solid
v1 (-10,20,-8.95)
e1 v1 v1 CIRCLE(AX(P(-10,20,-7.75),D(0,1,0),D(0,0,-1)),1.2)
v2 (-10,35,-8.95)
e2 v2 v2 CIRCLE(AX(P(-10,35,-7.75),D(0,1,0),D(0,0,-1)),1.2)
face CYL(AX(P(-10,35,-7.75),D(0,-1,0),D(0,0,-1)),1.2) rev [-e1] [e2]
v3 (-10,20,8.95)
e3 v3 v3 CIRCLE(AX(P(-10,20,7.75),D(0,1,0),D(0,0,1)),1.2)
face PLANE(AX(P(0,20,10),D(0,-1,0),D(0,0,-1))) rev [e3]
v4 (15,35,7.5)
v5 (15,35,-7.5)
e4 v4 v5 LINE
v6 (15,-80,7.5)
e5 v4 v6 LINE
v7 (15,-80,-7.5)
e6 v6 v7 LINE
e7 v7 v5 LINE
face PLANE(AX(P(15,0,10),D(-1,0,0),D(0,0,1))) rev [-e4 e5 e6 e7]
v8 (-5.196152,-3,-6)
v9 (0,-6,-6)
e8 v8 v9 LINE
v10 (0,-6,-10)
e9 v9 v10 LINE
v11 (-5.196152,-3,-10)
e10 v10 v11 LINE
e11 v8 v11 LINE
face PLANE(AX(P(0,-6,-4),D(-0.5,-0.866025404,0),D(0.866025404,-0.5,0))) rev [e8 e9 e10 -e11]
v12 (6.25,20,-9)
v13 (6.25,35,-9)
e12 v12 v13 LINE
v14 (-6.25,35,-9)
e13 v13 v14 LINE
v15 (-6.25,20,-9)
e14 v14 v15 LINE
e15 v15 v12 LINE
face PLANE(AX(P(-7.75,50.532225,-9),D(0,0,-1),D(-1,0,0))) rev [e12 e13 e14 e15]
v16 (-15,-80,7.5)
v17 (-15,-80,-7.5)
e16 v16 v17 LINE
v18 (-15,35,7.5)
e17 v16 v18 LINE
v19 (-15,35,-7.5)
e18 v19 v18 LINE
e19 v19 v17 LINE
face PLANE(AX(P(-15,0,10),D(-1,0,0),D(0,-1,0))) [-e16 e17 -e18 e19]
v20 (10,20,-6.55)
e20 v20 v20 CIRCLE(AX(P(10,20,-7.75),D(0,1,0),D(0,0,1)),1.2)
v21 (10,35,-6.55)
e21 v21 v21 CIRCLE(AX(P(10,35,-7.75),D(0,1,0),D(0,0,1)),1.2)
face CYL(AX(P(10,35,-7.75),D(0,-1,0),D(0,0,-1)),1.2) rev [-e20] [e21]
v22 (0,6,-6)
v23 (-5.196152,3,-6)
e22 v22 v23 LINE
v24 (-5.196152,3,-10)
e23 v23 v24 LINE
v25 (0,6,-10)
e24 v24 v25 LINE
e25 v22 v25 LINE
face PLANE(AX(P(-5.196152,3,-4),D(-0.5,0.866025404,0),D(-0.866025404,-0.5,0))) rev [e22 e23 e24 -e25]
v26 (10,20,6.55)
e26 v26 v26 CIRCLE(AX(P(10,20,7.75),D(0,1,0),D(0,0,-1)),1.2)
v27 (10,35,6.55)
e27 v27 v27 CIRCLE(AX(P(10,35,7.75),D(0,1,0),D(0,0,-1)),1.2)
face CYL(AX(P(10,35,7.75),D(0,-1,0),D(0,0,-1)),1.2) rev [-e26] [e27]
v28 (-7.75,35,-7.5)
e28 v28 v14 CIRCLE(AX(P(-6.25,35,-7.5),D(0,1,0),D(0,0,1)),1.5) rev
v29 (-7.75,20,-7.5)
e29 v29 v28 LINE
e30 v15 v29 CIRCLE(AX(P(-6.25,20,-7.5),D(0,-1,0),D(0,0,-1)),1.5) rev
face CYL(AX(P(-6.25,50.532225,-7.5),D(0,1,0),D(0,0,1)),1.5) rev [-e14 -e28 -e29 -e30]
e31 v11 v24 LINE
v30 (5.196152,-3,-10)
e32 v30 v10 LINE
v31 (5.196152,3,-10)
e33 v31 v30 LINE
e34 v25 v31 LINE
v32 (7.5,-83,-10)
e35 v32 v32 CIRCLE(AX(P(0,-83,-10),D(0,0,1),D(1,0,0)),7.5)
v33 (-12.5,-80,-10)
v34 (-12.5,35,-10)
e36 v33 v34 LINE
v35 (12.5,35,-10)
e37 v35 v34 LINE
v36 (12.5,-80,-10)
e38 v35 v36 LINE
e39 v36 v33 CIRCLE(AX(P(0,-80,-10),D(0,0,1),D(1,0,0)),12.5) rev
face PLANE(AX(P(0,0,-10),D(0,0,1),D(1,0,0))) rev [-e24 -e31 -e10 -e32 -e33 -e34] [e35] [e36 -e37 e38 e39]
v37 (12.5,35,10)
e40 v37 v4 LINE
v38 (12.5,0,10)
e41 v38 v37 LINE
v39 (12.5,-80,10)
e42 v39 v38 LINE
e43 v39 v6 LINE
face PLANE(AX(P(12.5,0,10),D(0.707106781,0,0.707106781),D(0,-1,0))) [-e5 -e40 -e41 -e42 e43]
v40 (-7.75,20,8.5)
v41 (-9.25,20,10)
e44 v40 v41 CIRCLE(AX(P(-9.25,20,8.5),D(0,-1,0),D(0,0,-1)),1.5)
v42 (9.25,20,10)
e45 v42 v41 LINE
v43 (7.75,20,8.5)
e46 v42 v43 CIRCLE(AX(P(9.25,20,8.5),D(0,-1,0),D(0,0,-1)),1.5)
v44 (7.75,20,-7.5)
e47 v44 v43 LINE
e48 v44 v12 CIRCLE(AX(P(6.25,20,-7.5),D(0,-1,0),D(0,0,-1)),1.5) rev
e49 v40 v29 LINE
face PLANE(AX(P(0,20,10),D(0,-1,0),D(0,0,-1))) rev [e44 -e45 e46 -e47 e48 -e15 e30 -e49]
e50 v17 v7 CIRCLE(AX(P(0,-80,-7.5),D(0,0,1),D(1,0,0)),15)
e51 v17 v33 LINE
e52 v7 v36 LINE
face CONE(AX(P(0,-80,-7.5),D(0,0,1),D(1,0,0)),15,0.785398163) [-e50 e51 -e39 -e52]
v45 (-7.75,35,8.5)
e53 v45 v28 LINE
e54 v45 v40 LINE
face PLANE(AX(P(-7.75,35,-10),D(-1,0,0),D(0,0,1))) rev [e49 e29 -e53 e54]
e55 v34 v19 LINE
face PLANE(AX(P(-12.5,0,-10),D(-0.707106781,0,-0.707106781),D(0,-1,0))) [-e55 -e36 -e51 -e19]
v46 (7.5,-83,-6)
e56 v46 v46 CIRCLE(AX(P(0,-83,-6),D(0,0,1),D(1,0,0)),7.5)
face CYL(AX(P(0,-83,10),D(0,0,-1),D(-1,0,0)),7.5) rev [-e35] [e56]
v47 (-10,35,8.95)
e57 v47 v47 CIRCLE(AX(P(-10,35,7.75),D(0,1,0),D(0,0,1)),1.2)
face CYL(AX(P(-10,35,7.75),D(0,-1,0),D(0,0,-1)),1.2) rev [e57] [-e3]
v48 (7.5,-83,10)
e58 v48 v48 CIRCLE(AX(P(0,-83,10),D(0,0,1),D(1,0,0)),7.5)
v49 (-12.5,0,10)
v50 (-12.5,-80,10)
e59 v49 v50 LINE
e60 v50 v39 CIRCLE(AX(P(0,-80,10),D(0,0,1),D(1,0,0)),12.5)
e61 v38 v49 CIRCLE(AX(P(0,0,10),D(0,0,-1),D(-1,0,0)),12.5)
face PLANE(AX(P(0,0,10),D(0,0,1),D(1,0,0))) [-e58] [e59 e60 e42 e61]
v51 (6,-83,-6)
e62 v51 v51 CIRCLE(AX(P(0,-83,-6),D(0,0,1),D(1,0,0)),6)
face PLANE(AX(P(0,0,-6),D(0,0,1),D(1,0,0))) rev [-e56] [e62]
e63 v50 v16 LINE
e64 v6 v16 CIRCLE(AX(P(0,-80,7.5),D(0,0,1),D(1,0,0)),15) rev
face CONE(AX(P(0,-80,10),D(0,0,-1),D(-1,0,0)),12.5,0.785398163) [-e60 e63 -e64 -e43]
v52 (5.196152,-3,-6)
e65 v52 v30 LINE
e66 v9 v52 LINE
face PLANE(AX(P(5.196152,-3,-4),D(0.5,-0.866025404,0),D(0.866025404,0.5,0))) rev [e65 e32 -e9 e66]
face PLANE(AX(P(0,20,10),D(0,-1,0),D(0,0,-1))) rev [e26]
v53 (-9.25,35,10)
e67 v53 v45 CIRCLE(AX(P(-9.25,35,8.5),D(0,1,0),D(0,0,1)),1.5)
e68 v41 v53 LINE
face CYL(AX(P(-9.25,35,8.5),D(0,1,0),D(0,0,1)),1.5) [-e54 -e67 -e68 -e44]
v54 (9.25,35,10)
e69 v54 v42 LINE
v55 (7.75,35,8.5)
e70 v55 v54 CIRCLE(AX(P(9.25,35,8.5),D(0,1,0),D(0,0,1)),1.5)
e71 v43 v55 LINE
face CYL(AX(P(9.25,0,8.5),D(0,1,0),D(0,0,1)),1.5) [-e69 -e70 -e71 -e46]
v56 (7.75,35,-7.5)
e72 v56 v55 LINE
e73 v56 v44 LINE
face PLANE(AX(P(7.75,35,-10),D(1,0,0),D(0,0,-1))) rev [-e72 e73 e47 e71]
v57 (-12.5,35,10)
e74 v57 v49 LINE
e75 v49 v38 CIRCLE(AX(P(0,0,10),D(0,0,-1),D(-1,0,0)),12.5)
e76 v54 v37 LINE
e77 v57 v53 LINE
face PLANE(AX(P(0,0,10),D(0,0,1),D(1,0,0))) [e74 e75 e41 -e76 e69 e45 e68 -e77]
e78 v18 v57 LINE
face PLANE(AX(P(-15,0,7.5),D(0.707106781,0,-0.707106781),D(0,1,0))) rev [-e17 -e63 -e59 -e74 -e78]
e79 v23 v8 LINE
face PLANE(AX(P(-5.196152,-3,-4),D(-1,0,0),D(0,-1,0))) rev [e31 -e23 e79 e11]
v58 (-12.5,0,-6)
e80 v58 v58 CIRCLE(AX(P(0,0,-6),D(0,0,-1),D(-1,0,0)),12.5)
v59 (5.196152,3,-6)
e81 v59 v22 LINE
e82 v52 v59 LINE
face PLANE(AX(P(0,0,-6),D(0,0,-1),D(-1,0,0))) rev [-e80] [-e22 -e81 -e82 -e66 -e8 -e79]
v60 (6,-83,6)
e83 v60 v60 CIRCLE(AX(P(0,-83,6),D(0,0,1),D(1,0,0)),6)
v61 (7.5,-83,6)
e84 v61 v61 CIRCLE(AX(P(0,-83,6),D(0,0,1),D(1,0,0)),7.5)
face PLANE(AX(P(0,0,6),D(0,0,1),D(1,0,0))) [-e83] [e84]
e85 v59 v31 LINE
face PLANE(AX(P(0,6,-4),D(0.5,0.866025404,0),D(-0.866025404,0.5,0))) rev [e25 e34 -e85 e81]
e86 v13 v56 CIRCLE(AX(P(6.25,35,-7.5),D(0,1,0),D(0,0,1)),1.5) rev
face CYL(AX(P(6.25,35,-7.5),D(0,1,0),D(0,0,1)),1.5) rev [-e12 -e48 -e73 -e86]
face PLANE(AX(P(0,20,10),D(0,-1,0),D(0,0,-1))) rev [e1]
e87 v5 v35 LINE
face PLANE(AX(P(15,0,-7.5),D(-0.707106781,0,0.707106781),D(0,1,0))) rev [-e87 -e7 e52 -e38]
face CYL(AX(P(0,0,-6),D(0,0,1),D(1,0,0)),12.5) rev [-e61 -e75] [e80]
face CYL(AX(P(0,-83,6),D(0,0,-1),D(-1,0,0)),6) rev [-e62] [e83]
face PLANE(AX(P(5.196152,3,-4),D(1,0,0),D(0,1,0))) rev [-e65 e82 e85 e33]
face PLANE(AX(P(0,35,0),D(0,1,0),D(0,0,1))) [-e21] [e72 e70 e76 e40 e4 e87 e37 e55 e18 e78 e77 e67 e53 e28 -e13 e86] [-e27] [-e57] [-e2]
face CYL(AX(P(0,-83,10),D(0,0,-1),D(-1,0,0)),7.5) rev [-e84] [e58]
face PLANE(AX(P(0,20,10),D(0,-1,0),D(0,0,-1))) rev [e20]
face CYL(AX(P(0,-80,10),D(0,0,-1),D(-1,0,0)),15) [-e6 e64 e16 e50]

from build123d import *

# Parameters (mm, degrees)
SKETCH1_R           = 4
SKETCH1_R_2         = 7.5
BOSS_EXTRUDE1_DEPTH = 10
SKETCH2_R           = 7.5
SKETCH2_R_2         = 6
BOSS_EXTRUDE2_DEPTH = 6
CUT_EXTRUDE2_DEPTH  = 6
SKETCH4_R           = 12.5
CUT_EXTRUDE1_DEPTH  = 16
SKETCH8_W           = 7.25
SKETCH8_H           = 20
SKETCH8_R           = 1.2
BOSS_EXTRUDE3_DEPTH = 15
SKETCH10_W          = 15.5
SKETCH10_H          = 1
BOSS_EXTRUDE4_DEPTH = 15
FILLET1_R           = 1.5
CHAMFER1_SIZE       = 2.5


with BuildPart() as part:
    # Sketch1 → Boss-Extrude1 (new, symmetric)
    with BuildSketch(Plane.XY):
        with BuildLine():
            Line((-15, -80), (-15, 20))
            Line((-15, 20), (15, 20))
            Line((15, 20), (15, -80))
            ThreePointArc((15, -80), (0, -95), (-15, -80))
        make_face()
        Circle(SKETCH1_R, mode=Mode.SUBTRACT)
        with Locations((0, -83)):
            Circle(SKETCH1_R_2, mode=Mode.SUBTRACT)
    extrude(amount=BOSS_EXTRUDE1_DEPTH, both=True)

    # Sketch2 → Boss-Extrude2 (add, symmetric)
    with BuildSketch(Plane.XY):
        with Locations((0, -83)):
            Circle(SKETCH2_R)
        with Locations((0, -83)):
            Circle(SKETCH2_R_2, mode=Mode.SUBTRACT)
    extrude(amount=BOSS_EXTRUDE2_DEPTH, both=True)

    # Sketch11 → Cut-Extrude2 (cut)
    with BuildSketch(Plane(origin=(0, 0, -10), x_dir=(-1, 0, 0), z_dir=(0, 0, -1))):
        Polygon((0, 6), (-5.196152423, 3), (-5.196152423, -3), (0, -6), (5.196152423, -3), (5.196152423, 3), align=None)
    extrude(amount=-CUT_EXTRUDE2_DEPTH, mode=Mode.SUBTRACT)

    # Sketch4 → Cut-Extrude1 (cut)
    with BuildSketch(Plane(origin=(0, 0, 10), x_dir=(-1, 0, 0), z_dir=(0, 0, -1))):
        Circle(SKETCH4_R)
    extrude(amount=CUT_EXTRUDE1_DEPTH, mode=Mode.SUBTRACT)

    # Sketch8 → Boss-Extrude3 (add)
    # profile 1 of 2: a face of its own
    with BuildSketch(Plane(origin=(0, 20, 0), x_dir=(1, 0, 0), z_dir=(0, 1, 0))):
        with Locations((-11.375, 0)):
            Rectangle(SKETCH8_W, SKETCH8_H)
        with Locations(Location((-10, -7.75, 0), (0, 0, 270))):
            Circle(SKETCH8_R, mode=Mode.SUBTRACT)
        with Locations(Location((-10, 7.75, 0), (0, 0, 90))):
            Circle(SKETCH8_R, mode=Mode.SUBTRACT)
    # profile 2 of 2: a face of its own
    with BuildSketch(Plane(origin=(0, 20, 0), x_dir=(1, 0, 0), z_dir=(0, 1, 0))):
        with Locations((11.375, 0)):
            Rectangle(SKETCH8_W, SKETCH8_H)
        with Locations(Location((10, -7.75, 0), (0, 0, 90))):
            Circle(SKETCH8_R, mode=Mode.SUBTRACT)
        with Locations(Location((10, 7.75, 0), (0, 0, 270))):
            Circle(SKETCH8_R, mode=Mode.SUBTRACT)
    extrude(amount=BOSS_EXTRUDE3_DEPTH)

    # Sketch10 → Boss-Extrude4 (add)
    with BuildSketch(Plane(origin=(0, 20, 0), x_dir=(1, 0, 0), z_dir=(0, 1, 0))):
        with Locations((0, 9.5)):
            Rectangle(SKETCH10_W, SKETCH10_H)
    extrude(amount=BOSS_EXTRUDE4_DEPTH)

    # Fillet1
    fillet1_edges = [part.edges().sort_by_distance(p)[0] for p in [
        (-7.75, 27.5, -9),
        (7.75, 27.5, -9),
        (-7.75, 27.5, 10),
        (7.75, 27.5, 10),
    ]]
    fillet(fillet1_edges, radius=FILLET1_R)

    # Chamfer1
    chamfer1_edges = [part.edges().sort_by_distance(p)[0] for p in [
        (-15, -22.5, 10),
        (0, -95, 10),
        (15, -22.5, 10),
        (15, -22.5, -10),
        (0, -95, -10),
        (-15, -22.5, -10),
    ]]
    chamfer(chamfer1_edges, length=CHAMFER1_SIZE - 0.0001)  # a hair under: the kernel refuses the full size


solid = part.part
